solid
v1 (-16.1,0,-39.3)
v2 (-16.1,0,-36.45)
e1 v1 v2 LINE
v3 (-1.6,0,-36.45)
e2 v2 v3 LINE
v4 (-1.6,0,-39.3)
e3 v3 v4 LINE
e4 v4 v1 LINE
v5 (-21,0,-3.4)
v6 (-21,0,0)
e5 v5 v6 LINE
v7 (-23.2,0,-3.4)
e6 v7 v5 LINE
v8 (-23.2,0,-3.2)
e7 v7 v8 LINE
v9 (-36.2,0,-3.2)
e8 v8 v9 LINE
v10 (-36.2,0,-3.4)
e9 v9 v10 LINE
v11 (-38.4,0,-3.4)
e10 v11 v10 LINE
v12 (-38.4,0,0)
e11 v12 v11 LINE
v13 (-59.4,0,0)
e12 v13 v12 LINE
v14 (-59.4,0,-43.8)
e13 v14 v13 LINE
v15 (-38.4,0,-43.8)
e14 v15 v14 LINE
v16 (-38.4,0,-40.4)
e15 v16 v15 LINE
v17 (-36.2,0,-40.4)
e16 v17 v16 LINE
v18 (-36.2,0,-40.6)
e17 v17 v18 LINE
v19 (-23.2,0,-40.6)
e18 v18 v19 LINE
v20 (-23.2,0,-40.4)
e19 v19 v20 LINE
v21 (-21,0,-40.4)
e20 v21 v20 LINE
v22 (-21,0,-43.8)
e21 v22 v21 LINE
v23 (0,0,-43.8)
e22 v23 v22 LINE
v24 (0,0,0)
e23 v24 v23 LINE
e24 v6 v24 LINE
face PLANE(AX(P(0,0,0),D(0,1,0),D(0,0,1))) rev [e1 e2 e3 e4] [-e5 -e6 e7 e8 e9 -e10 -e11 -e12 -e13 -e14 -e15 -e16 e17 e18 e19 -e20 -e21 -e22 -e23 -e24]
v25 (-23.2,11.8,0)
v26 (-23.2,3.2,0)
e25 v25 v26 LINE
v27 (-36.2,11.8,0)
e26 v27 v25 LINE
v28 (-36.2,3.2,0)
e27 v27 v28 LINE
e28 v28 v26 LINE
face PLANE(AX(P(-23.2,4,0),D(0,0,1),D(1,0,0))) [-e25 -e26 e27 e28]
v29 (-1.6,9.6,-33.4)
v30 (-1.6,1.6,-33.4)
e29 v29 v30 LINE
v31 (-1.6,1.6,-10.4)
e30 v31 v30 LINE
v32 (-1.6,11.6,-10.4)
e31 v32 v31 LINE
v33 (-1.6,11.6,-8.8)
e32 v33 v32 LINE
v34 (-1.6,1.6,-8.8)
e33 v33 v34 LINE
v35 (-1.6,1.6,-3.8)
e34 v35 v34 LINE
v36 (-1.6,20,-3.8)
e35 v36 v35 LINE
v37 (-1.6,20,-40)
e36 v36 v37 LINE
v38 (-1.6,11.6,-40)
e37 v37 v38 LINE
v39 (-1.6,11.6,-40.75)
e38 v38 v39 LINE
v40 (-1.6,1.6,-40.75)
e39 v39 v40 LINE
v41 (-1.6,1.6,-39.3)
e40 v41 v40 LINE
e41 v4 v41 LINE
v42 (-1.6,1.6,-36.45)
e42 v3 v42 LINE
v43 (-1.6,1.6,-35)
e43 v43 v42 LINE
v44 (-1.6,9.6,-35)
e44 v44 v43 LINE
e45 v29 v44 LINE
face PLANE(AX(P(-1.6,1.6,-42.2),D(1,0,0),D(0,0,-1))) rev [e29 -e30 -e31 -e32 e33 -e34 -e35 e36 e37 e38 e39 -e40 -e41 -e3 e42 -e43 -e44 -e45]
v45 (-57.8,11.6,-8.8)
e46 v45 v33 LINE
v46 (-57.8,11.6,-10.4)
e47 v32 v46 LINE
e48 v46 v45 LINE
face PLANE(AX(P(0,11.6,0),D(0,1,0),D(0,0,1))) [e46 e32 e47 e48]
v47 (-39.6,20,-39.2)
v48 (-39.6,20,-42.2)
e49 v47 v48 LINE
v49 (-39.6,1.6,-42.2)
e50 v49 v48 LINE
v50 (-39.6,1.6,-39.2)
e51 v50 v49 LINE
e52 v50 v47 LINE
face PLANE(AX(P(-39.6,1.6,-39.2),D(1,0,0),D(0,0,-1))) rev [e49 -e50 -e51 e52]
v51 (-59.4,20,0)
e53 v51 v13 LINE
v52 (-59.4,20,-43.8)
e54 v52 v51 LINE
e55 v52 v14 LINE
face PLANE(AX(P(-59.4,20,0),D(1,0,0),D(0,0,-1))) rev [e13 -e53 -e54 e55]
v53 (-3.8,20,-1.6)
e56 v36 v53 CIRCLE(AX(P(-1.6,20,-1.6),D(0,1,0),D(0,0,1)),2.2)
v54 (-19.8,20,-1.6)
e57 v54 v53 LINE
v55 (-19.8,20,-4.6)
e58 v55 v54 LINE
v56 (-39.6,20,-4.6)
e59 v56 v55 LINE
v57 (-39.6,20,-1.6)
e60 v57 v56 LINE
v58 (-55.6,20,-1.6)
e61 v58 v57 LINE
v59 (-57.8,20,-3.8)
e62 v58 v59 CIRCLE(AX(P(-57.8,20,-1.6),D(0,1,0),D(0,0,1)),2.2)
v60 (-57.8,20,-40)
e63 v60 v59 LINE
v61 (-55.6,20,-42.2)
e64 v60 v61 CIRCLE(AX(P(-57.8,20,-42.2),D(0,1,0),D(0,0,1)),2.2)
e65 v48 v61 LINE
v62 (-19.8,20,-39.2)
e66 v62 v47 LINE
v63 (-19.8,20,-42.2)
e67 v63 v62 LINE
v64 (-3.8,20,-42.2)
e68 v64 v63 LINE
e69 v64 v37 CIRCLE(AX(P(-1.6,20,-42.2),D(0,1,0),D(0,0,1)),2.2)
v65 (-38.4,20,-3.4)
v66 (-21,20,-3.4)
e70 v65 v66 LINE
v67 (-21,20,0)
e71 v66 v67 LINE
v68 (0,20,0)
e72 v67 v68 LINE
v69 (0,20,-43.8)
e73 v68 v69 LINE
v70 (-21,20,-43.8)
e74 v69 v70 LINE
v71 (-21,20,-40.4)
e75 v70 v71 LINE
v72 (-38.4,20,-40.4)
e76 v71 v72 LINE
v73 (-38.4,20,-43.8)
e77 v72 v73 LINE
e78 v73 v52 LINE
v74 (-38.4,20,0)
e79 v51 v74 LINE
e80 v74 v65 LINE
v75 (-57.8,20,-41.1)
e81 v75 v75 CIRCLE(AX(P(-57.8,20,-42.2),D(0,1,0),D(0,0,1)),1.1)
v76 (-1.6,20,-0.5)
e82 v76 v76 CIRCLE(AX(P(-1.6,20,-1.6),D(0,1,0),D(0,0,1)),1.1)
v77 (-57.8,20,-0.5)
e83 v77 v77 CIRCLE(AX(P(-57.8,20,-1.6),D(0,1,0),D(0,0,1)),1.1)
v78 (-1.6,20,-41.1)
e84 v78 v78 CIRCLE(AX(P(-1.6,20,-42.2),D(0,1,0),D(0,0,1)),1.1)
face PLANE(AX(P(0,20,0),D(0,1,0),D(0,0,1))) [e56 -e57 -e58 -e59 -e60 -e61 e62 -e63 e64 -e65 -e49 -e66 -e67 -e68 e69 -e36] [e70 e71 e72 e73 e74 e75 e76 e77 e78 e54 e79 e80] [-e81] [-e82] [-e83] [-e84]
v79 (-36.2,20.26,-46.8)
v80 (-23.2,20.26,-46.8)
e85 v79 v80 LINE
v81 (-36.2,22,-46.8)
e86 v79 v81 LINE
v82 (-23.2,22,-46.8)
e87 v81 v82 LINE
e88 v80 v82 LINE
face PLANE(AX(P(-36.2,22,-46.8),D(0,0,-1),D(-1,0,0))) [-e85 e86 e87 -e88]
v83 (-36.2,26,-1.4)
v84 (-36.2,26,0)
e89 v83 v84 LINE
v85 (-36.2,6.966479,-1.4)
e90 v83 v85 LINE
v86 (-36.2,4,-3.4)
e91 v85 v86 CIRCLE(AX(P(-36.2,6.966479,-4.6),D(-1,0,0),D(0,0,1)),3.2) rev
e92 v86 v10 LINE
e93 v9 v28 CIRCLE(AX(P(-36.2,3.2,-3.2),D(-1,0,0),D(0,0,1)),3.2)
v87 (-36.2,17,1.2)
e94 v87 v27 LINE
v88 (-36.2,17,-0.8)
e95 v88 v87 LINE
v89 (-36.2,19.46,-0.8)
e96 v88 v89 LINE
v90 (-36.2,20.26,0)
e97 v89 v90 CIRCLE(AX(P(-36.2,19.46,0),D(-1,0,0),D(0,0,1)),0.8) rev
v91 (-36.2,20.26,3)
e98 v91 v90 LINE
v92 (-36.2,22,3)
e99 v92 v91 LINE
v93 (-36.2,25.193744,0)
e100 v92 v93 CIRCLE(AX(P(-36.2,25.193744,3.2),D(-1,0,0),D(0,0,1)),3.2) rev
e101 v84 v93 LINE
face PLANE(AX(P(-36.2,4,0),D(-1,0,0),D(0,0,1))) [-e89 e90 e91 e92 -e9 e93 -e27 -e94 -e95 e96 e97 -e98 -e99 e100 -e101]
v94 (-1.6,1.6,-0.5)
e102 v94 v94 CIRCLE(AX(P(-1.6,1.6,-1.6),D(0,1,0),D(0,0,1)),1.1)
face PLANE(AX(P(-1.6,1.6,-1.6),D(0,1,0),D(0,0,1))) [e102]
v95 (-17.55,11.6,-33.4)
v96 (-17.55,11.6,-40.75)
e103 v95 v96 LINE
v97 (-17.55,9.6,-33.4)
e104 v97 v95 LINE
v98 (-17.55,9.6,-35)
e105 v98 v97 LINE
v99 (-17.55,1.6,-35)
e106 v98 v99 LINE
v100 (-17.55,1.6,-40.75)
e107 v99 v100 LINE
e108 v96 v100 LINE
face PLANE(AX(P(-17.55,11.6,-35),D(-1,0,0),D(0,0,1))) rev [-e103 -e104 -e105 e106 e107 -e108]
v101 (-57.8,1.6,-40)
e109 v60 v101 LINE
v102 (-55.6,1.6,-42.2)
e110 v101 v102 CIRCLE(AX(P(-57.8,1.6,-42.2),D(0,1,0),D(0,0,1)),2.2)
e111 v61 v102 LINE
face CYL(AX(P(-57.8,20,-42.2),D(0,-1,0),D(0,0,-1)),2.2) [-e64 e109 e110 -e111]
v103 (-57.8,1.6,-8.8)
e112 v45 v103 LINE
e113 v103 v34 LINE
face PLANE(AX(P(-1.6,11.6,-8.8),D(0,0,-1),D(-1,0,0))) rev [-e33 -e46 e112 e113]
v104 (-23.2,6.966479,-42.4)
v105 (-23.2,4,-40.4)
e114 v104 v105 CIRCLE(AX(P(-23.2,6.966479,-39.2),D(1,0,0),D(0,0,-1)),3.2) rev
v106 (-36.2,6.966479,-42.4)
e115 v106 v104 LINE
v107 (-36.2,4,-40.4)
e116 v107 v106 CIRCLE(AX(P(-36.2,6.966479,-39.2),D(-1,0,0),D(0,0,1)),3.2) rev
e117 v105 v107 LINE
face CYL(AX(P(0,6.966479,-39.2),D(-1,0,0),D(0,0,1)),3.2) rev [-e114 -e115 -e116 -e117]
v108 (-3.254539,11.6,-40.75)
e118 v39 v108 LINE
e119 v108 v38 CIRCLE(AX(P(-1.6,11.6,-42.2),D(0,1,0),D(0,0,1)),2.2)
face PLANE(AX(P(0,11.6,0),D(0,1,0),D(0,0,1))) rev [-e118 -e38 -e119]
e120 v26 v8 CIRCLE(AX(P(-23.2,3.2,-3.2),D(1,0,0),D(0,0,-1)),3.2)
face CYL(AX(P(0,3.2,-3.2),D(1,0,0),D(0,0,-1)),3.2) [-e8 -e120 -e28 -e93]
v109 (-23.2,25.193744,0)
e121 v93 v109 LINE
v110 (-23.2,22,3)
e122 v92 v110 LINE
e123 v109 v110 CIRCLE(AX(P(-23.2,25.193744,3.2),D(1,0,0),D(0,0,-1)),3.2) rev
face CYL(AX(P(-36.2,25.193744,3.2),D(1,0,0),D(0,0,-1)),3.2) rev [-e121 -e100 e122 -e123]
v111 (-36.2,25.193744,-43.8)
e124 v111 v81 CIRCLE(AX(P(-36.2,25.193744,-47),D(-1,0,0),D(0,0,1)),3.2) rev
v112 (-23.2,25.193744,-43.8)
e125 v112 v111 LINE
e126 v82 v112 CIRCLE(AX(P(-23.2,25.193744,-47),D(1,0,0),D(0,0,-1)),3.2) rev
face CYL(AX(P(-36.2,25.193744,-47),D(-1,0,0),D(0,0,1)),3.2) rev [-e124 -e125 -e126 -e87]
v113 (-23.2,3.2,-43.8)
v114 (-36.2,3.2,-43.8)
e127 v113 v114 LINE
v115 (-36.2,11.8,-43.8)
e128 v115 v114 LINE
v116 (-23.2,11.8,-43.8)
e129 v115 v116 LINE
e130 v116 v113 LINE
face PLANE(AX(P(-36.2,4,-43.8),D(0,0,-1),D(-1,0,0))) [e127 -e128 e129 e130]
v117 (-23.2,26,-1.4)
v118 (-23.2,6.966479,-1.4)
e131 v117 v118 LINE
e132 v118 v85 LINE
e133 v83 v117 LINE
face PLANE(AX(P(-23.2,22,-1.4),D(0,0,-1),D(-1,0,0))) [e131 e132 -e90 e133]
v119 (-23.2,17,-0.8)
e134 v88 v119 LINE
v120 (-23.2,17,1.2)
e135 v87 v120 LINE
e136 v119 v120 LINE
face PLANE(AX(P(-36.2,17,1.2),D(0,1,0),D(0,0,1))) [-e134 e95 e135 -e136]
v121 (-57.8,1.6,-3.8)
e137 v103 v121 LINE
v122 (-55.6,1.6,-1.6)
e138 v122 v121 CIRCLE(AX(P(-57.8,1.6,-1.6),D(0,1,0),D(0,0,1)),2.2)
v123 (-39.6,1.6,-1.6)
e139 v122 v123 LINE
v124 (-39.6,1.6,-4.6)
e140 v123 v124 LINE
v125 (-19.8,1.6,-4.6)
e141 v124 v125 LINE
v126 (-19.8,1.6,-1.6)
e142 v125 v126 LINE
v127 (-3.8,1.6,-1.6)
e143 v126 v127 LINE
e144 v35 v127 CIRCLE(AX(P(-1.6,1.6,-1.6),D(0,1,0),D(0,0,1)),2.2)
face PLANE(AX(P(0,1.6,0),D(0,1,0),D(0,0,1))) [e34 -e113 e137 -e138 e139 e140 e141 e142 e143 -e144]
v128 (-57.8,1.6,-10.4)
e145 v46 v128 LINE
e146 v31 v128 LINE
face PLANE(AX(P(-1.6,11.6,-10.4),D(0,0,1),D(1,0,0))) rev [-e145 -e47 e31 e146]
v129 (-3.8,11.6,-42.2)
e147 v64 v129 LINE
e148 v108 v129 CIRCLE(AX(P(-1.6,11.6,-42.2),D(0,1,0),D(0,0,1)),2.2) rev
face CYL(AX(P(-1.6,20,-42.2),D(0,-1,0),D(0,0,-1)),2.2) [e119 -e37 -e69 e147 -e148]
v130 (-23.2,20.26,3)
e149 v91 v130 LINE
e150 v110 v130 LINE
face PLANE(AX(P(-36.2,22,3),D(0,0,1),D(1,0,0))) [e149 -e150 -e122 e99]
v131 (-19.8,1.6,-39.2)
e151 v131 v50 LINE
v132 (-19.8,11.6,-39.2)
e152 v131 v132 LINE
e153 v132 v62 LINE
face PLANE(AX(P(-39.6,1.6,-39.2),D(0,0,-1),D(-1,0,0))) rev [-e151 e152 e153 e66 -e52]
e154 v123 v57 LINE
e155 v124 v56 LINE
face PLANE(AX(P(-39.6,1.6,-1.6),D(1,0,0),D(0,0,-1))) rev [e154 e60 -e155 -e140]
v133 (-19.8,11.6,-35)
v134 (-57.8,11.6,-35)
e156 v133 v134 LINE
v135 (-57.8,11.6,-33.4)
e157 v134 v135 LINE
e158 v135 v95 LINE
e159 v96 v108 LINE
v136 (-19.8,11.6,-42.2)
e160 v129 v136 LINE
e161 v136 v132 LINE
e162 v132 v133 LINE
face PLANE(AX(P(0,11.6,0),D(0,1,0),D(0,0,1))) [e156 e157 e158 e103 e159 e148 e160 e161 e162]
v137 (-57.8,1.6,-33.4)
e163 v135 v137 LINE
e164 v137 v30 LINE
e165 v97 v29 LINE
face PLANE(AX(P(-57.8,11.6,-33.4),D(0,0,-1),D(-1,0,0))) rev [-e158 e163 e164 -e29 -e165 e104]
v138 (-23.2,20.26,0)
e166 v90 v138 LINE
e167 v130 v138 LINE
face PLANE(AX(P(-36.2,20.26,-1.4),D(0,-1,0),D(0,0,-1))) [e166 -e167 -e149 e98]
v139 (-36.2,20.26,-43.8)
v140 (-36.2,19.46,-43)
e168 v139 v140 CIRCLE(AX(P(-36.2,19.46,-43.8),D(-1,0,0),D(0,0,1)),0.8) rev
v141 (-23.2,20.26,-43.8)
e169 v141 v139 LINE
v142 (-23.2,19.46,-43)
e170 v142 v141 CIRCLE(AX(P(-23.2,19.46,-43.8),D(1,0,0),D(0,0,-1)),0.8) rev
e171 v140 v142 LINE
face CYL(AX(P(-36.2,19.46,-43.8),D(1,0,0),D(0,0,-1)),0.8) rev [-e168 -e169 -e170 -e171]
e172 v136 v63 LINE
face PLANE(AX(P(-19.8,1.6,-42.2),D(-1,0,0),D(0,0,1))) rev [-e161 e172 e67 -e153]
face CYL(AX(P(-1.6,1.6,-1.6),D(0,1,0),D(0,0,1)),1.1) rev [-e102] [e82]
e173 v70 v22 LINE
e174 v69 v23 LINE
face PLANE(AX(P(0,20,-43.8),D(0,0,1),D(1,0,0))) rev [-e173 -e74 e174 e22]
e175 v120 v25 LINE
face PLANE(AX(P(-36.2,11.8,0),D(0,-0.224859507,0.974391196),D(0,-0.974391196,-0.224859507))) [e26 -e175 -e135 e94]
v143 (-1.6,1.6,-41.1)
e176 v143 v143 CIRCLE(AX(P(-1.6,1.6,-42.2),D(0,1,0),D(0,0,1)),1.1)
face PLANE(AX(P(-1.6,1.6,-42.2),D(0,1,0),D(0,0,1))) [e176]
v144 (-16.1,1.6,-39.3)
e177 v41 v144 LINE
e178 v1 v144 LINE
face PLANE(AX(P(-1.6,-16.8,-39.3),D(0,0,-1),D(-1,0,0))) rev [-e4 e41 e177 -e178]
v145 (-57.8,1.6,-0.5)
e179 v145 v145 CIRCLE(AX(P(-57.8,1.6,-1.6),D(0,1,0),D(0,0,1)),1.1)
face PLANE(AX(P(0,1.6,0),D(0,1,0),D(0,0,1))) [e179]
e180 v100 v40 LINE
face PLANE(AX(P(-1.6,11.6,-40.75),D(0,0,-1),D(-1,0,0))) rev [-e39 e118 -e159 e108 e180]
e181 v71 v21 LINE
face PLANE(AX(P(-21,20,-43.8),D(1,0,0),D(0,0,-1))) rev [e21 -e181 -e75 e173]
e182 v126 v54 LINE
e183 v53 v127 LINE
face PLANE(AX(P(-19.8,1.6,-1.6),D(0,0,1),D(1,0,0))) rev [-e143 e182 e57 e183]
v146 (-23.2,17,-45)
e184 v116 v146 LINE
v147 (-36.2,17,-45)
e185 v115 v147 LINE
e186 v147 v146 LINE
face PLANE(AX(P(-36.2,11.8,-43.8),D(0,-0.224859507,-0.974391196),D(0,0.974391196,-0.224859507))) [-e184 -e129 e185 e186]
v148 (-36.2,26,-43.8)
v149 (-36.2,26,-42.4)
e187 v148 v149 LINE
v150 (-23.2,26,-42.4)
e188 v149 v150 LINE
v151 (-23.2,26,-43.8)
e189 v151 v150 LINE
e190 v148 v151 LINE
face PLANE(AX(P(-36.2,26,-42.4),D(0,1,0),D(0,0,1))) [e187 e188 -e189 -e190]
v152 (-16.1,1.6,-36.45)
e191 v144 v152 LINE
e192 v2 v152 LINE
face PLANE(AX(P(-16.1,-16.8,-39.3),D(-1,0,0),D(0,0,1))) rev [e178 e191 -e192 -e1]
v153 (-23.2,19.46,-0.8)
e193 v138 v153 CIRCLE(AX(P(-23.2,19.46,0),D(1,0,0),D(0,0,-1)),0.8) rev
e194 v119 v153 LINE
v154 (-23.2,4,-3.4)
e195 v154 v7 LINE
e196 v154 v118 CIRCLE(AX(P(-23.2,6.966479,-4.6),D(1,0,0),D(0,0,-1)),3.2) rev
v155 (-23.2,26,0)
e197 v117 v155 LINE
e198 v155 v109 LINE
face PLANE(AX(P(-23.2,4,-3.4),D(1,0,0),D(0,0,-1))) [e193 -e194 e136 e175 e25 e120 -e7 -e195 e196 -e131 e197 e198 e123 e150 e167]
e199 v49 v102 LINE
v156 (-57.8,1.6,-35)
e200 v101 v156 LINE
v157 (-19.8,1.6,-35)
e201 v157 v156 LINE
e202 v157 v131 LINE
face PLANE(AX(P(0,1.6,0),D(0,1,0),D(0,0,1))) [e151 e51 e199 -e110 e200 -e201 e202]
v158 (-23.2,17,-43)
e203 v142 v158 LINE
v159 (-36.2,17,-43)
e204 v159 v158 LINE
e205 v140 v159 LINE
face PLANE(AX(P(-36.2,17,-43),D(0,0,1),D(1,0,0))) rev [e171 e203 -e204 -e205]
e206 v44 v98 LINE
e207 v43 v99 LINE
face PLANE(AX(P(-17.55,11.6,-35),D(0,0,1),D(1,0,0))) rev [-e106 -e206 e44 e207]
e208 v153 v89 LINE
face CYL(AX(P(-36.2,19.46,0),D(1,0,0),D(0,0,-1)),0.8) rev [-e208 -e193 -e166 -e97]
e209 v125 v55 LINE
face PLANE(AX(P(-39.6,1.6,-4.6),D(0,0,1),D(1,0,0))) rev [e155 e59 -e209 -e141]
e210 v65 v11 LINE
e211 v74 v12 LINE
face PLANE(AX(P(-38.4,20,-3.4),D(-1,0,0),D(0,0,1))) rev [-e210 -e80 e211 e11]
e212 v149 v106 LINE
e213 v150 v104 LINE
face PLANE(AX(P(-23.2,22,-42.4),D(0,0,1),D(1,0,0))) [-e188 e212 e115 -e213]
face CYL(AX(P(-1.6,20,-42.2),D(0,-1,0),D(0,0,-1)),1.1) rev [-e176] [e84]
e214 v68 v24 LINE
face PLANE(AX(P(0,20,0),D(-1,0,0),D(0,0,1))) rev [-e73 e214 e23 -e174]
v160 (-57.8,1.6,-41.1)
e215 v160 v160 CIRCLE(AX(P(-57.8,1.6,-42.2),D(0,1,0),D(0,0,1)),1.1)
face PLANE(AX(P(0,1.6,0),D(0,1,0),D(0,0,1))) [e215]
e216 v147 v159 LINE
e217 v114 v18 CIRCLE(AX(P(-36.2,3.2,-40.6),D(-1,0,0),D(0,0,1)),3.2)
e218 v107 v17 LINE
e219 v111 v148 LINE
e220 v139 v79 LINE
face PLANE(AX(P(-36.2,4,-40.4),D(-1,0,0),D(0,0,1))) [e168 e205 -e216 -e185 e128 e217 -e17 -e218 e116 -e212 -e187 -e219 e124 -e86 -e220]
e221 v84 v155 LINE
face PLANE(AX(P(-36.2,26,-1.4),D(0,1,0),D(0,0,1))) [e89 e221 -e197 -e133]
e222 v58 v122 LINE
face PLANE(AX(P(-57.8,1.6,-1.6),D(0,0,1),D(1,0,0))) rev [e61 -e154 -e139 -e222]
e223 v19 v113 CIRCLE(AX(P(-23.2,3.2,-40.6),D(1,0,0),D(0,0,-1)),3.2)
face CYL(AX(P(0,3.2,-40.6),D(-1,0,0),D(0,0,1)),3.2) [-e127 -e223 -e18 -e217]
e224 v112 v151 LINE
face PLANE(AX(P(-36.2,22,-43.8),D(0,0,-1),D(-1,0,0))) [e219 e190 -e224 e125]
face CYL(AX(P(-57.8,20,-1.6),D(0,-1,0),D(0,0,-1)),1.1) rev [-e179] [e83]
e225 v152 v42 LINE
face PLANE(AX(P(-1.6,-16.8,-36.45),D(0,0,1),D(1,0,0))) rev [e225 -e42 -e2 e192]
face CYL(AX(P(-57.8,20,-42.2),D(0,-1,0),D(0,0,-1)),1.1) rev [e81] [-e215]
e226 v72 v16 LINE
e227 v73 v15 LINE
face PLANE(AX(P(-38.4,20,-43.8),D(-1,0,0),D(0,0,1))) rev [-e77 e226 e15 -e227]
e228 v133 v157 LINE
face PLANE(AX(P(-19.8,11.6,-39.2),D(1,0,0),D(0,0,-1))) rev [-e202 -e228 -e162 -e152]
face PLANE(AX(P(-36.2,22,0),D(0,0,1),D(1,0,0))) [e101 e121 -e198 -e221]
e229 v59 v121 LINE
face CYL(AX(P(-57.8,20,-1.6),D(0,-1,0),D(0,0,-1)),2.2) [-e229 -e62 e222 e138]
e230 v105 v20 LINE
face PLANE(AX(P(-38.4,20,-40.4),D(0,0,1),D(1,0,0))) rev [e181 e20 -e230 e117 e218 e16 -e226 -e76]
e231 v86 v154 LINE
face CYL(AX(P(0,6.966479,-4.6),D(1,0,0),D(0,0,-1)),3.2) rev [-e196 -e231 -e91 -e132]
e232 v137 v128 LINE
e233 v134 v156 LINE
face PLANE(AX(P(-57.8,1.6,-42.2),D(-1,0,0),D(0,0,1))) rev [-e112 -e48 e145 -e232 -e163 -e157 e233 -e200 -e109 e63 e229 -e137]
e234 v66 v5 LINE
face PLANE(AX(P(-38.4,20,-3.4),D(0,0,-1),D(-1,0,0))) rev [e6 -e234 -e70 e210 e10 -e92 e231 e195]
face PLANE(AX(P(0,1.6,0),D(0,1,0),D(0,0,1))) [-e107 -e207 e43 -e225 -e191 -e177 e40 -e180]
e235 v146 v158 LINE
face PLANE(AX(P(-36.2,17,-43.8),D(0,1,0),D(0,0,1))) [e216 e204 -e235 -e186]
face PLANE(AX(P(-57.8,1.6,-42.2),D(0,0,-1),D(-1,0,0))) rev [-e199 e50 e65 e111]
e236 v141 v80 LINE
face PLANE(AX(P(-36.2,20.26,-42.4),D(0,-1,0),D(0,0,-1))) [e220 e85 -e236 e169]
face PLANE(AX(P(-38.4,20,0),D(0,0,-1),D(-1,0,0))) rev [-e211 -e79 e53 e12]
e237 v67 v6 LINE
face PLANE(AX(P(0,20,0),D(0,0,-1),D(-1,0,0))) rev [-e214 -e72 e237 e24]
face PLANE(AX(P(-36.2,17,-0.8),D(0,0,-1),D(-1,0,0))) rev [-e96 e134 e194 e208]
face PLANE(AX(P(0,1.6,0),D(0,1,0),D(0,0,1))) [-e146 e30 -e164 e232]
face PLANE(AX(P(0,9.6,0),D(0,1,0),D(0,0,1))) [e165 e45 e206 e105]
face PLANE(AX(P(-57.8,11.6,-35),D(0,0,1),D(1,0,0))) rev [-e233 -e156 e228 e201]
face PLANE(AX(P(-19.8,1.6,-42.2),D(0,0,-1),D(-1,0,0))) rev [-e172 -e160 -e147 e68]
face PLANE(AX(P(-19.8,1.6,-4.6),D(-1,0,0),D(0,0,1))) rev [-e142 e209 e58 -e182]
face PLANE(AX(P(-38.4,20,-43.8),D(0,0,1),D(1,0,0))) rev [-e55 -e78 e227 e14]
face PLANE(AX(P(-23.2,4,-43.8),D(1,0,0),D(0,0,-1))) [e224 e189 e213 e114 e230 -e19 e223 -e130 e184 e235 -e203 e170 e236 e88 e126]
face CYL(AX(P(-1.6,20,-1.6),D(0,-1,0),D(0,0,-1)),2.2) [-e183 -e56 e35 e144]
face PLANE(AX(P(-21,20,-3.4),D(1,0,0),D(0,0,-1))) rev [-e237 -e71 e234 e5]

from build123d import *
from build123d.topology import SkipClean

# Parameters (mm, degrees)
BOSS_EXTRUDE1_DEPTH   = 20
CUT_EXTRUDE1_DEPTH    = 18.4
SKETCH3_W             = 14.5
SKETCH3_H             = 2.85
CUT_EXTRUDE2_DEPTH    = 18.4
SKETCH4_W             = 13
SKETCH4_H             = 1.4
BOSS_EXTRUDE2_DEPTH   = 22
BOSS_EXTRUDE2_2_DEPTH = 22
SKETCH5_W             = 13
SKETCH5_H             = 3.4
BOSS_EXTRUDE3_DEPTH   = 4
FILLET1_R             = 3.2
FILLET2_R             = 3.2
BOSS_EXTRUDE4_DEPTH   = 13
SKETCH8_W             = 0.8
SKETCH8_H             = 3.26
CUT_EXTRUDE3_DEPTH    = 13
FILLET3_R             = 3.2
FILLET4_R             = 0.8
SKETCH9_W             = 56.2
SKETCH9_H             = 1.6
BOSS_EXTRUDE5_DEPTH   = 10
SKETCH13_W            = 15.95
SKETCH13_H            = 1.6
CUT_EXTRUDE6_DEPTH    = 2
BOSS_EXTRUDE6_DEPTH   = 18.4
CUT_EXTRUDE5_START    = -18.4
SKETCH12_R            = 1.1
CUT_EXTRUDE5_DEPTH    = 18.4
SKETCH14_W            = 15.95
SKETCH14_H            = 5.75
CUT_EXTRUDE7_DEPTH    = 10


with BuildPart() as part:
    # Sketch1 → Boss-Extrude1 (new body)
    with BuildSketch(Plane(origin=(0, 0, 0), x_dir=(1, 0, 0), z_dir=(0, 1, 0))):
        Polygon((-38.4, 43.8), (-38.4, 40.4), (-21, 40.4), (-21, 43.8), (0, 43.8), (0, 0), (-21, 0), (-21, 3.4), (-38.4, 3.4), (-38.4, 0), (-59.4, 0), (-59.4, 43.8), align=None)
    extrude(amount=BOSS_EXTRUDE1_DEPTH)

    # Sketch2 → Cut-Extrude1 (cut)
    with BuildSketch(Plane(origin=(0, 20, 0), x_dir=(1, 0, 0), z_dir=(0, 1, 0))):
        Polygon((-57.8, 42.2), (-39.6, 42.2), (-39.6, 39.2), (-19.8, 39.2), (-19.8, 42.2), (-1.6, 42.2), (-1.6, 1.6), (-19.8, 1.6), (-19.8, 4.6), (-39.6, 4.6), (-39.6, 1.6), (-57.8, 1.6), align=None)
    extrude(amount=-CUT_EXTRUDE1_DEPTH, mode=Mode.SUBTRACT)

    # Sketch3 → Cut-Extrude2 (cut)
    with BuildSketch(Plane(origin=(0, 1.6, 0), x_dir=(1, 0, 0), z_dir=(0, 1, 0))):
        with Locations((-8.85, 37.875)):
            Rectangle(SKETCH3_W, SKETCH3_H)
    extrude(amount=-CUT_EXTRUDE2_DEPTH, mode=Mode.SUBTRACT)



with BuildPart() as body_2:
    # Sketch4 → Boss-Extrude2 (new body)
    with BuildSketch(Plane.XZ):
        with Locations((-29.7, -0.7)):
            Rectangle(SKETCH4_W, SKETCH4_H)
    extrude(amount=-BOSS_EXTRUDE2_DEPTH)


with BuildPart() as body_3:
    # Sketch4 → Boss-Extrude2 2 (new body)
    with BuildSketch(Plane.XZ):
        with Locations((-29.7, -43.1)):
            Rectangle(SKETCH4_W, SKETCH4_H)
    extrude(amount=-BOSS_EXTRUDE2_2_DEPTH)


with BuildPart() as part_1:
    add(part.part)

    add(body_2.part)  # Boss-Extrude3 merges body 2

    add(body_3.part)  # Boss-Extrude3 merges body 3
    # Sketch5 → Boss-Extrude3 (add)
    with BuildSketch(Plane(origin=(0, 0, 0), x_dir=(-1, 0, 0), z_dir=(0, -1, 0))):
        with Locations((29.7, 1.7)):
            Rectangle(SKETCH5_W, SKETCH5_H)
        with Locations((29.7, 42.1)):
            Rectangle(SKETCH5_W, SKETCH5_H)
    extrude(amount=-BOSS_EXTRUDE3_DEPTH)

    # Fillet1
    fillet1_edges = [part_1.edges().sort_by_distance(p)[0] for p in [
        (-29.7, 0, -43.8),
        (-29.7, 0, 0),
    ]]
    fillet(fillet1_edges, radius=FILLET1_R)

    # Fillet2
    # the kernel refuses this fillet: 3.2 mm, written as the material it adds along each edge
    with BuildSketch(Plane(origin=(-36.2, 4, -1.4), x_dir=(0, 0, -1), z_dir=(1, 0, 0)), Plane(origin=(-23.2, 4, -42.4), x_dir=(0, 0, 1), z_dir=(-1, 0, 0))) as fillet2_piece_1:
        with BuildLine():
            CenterArc((3.2, 2.966479395), FILLET2_R, 180, 67.975687163)
            Line((0, 2.966479395), (-0.064, 2.966479395))
            Line((-0.064, 2.966479395), (-0.064, 0))
            Line((-0.064, 0), (0, -0.064))
            ThreePointArc((0, -0.064), (1, -0.064), (1.976, -0.059329588))
            Line((1.976, -0.059329588), (2, 0))
        make_face()
    extrude(amount=13)

    # Sketch7 → Boss-Extrude4 (add)
    with BuildSketch(Plane(origin=(-23.2, 0, 0), x_dir=(0, 0, -1), z_dir=(1, 0, 0))):
        Polygon((-1.2, 17), (0, 17), (0, 11.8), align=None)
        Polygon((43.8, 11.8), (43.8, 17), (45, 17), align=None)
        Polygon((0, 22), (-3, 22), (-3, 20.26), (1.4, 20.26), (1.4, 22), (1.4, 26), (0, 26), align=None)
        Polygon((43.8, 22), (46.8, 22), (46.8, 20.26), (42.4, 20.26), (42.4, 22), (42.4, 26), (43.8, 26), align=None)
    extrude(amount=-BOSS_EXTRUDE4_DEPTH)

    # Sketch8 → Cut-Extrude3 (cut)
    with BuildSketch(Plane(origin=(-23.2, 0, 0), x_dir=(0, 0, -1), z_dir=(1, 0, 0))):
        with Locations((0.4, 18.63)):
            Rectangle(SKETCH8_W, SKETCH8_H)
        with Locations((43.4, 18.63)):
            Rectangle(SKETCH8_W, SKETCH8_H)
    extrude(amount=-CUT_EXTRUDE3_DEPTH, mode=Mode.SUBTRACT)

    # Fillet3
    # the kernel refuses this fillet: 3.2 mm, written as the material it adds along each edge
    with BuildSketch(Plane(origin=(-36.2, 22, 0), x_dir=(0, 1, 0), z_dir=(1, 0, 0)), Plane(origin=(-23.2, 22, -43.8), x_dir=(0, 1, 0), z_dir=(-1, 0, 0))) as fillet3_piece_1:
        with BuildLine():
            CenterArc((3.193743885, 3.2), FILLET3_R, 183.583321698, 86.416678302)
            Line((0, 3), (-0.063874878, 2.996))
            ThreePointArc((-0.063874878, 2.996), (-0.064, 1.5), (-0.064, 0))
            Line((-0.064, 0), (0, -0.064))
            Line((0, -0.064), (3.193743885, -0.064))
            Line((3.193743885, -0.064), (3.193743885, 0))
        make_face()
    extrude(amount=13)

    # Fillet4
    fillet4_edges = [part_1.edges().sort_by_distance(p)[0] for p in [
        (-29.7, 20.26, -0.8),
        (-29.7, 20.26, -43),
    ]]
    fillet(fillet4_edges, radius=FILLET4_R)

    # Sketch9 → Boss-Extrude5 (add)
    with BuildSketch(Plane(origin=(0, 1.6, 0), x_dir=(1, 0, 0), z_dir=(0, 1, 0))):
        Polygon((-57.8, 35), (-19.8, 35), (-19.8, 39.2), (-19.8, 42.2), (-1.6, 42.2), (-1.6, 40.75), (-17.55, 40.75), (-17.55, 35), (-1.6, 35), (-1.6, 33.4), (-57.8, 33.4), align=None)
        with Locations((-29.7, 9.6)):
            Rectangle(SKETCH9_W, SKETCH9_H)
    extrude(amount=BOSS_EXTRUDE5_DEPTH)

    # Sketch13 → Cut-Extrude6 (cut)
    with BuildSketch(Plane(origin=(0, 11.6, 0), x_dir=(1, 0, 0), z_dir=(0, 1, 0))):
        with Locations((-9.575, 34.2)):
            Rectangle(SKETCH13_W, SKETCH13_H)
    extrude(amount=-CUT_EXTRUDE6_DEPTH, mode=Mode.SUBTRACT)

    # Sketch11 → Boss-Extrude6 (add)
    with BuildSketch(Plane(origin=(0, 1.6, 0), x_dir=(1, 0, 0), z_dir=(0, 1, 0))):
        with BuildLine():
            Line((-57.8, 41.1), (-57.8, 40))
            ThreePointArc((-57.8, 40), (-56.244365081, 40.644365081), (-55.6, 42.2))
            Line((-55.6, 42.2), (-56.7, 42.2))
            ThreePointArc((-56.7, 42.2), (-57.022182541, 41.422182541), (-57.8, 41.1))
        make_face()
        with BuildLine():
            Line((-56.7, 1.6), (-55.6, 1.6))
            ThreePointArc((-55.6, 1.6), (-56.244365081, 3.155634919), (-57.8, 3.8))
            Line((-57.8, 3.8), (-57.8, 2.7))
            ThreePointArc((-57.8, 2.7), (-57.022182541, 2.377817459), (-56.7, 1.6))
        make_face()
        with BuildLine():
            Line((-1.6, 40), (-1.6, 41.1))
            ThreePointArc((-1.6, 41.1), (-2.377817459, 41.422182541), (-2.7, 42.2))
            Line((-2.7, 42.2), (-3.8, 42.2))
            ThreePointArc((-3.8, 42.2), (-3.155634919, 40.644365081), (-1.6, 40))
        make_face()
        with BuildLine():
            ThreePointArc((-1.6, 3.8), (-3.155634919, 3.155634919), (-3.8, 1.6))
            Line((-3.8, 1.6), (-1.6, 1.6))
            Line((-1.6, 1.6), (-1.6, 3.8))
        make_face()
    extrude(amount=BOSS_EXTRUDE6_DEPTH)

    # Sketch12 → Cut-Extrude5 (cut)
    with SkipClean():  # the faces are left unmerged after this step: merging them gives an invalid solid
        with BuildSketch(Plane(origin=(0, 20, 0), x_dir=(1, 0, 0), z_dir=(0, 1, 0)).offset(CUT_EXTRUDE5_START)):
            with Locations(Location((-57.8, 42.2, 0), (0, 0, 270))):
                Circle(SKETCH12_R)
            with Locations(Location((-57.8, 1.6, 0), (0, 0, 270))):
                Circle(SKETCH12_R)
            with Locations(Location((-1.6, 1.6, 0), (0, 0, 270))):
                Circle(SKETCH12_R)
            with Locations(Location((-1.6, 42.2, 0), (0, 0, 270))):
                Circle(SKETCH12_R)
        extrude(amount=CUT_EXTRUDE5_DEPTH, mode=Mode.SUBTRACT)

    # Sketch14 → Cut-Extrude7 (cut)
    with SkipClean():  # the faces are left unmerged after this step: merging them gives an invalid solid
        with BuildSketch(Plane(origin=(0, 1.6, 0), x_dir=(1, 0, 0), z_dir=(0, 1, 0))):
            with Locations((-9.575, 37.875)):
                Rectangle(SKETCH14_W, SKETCH14_H)
        extrude(amount=CUT_EXTRUDE7_DEPTH, mode=Mode.SUBTRACT)


solid = part_1.part
